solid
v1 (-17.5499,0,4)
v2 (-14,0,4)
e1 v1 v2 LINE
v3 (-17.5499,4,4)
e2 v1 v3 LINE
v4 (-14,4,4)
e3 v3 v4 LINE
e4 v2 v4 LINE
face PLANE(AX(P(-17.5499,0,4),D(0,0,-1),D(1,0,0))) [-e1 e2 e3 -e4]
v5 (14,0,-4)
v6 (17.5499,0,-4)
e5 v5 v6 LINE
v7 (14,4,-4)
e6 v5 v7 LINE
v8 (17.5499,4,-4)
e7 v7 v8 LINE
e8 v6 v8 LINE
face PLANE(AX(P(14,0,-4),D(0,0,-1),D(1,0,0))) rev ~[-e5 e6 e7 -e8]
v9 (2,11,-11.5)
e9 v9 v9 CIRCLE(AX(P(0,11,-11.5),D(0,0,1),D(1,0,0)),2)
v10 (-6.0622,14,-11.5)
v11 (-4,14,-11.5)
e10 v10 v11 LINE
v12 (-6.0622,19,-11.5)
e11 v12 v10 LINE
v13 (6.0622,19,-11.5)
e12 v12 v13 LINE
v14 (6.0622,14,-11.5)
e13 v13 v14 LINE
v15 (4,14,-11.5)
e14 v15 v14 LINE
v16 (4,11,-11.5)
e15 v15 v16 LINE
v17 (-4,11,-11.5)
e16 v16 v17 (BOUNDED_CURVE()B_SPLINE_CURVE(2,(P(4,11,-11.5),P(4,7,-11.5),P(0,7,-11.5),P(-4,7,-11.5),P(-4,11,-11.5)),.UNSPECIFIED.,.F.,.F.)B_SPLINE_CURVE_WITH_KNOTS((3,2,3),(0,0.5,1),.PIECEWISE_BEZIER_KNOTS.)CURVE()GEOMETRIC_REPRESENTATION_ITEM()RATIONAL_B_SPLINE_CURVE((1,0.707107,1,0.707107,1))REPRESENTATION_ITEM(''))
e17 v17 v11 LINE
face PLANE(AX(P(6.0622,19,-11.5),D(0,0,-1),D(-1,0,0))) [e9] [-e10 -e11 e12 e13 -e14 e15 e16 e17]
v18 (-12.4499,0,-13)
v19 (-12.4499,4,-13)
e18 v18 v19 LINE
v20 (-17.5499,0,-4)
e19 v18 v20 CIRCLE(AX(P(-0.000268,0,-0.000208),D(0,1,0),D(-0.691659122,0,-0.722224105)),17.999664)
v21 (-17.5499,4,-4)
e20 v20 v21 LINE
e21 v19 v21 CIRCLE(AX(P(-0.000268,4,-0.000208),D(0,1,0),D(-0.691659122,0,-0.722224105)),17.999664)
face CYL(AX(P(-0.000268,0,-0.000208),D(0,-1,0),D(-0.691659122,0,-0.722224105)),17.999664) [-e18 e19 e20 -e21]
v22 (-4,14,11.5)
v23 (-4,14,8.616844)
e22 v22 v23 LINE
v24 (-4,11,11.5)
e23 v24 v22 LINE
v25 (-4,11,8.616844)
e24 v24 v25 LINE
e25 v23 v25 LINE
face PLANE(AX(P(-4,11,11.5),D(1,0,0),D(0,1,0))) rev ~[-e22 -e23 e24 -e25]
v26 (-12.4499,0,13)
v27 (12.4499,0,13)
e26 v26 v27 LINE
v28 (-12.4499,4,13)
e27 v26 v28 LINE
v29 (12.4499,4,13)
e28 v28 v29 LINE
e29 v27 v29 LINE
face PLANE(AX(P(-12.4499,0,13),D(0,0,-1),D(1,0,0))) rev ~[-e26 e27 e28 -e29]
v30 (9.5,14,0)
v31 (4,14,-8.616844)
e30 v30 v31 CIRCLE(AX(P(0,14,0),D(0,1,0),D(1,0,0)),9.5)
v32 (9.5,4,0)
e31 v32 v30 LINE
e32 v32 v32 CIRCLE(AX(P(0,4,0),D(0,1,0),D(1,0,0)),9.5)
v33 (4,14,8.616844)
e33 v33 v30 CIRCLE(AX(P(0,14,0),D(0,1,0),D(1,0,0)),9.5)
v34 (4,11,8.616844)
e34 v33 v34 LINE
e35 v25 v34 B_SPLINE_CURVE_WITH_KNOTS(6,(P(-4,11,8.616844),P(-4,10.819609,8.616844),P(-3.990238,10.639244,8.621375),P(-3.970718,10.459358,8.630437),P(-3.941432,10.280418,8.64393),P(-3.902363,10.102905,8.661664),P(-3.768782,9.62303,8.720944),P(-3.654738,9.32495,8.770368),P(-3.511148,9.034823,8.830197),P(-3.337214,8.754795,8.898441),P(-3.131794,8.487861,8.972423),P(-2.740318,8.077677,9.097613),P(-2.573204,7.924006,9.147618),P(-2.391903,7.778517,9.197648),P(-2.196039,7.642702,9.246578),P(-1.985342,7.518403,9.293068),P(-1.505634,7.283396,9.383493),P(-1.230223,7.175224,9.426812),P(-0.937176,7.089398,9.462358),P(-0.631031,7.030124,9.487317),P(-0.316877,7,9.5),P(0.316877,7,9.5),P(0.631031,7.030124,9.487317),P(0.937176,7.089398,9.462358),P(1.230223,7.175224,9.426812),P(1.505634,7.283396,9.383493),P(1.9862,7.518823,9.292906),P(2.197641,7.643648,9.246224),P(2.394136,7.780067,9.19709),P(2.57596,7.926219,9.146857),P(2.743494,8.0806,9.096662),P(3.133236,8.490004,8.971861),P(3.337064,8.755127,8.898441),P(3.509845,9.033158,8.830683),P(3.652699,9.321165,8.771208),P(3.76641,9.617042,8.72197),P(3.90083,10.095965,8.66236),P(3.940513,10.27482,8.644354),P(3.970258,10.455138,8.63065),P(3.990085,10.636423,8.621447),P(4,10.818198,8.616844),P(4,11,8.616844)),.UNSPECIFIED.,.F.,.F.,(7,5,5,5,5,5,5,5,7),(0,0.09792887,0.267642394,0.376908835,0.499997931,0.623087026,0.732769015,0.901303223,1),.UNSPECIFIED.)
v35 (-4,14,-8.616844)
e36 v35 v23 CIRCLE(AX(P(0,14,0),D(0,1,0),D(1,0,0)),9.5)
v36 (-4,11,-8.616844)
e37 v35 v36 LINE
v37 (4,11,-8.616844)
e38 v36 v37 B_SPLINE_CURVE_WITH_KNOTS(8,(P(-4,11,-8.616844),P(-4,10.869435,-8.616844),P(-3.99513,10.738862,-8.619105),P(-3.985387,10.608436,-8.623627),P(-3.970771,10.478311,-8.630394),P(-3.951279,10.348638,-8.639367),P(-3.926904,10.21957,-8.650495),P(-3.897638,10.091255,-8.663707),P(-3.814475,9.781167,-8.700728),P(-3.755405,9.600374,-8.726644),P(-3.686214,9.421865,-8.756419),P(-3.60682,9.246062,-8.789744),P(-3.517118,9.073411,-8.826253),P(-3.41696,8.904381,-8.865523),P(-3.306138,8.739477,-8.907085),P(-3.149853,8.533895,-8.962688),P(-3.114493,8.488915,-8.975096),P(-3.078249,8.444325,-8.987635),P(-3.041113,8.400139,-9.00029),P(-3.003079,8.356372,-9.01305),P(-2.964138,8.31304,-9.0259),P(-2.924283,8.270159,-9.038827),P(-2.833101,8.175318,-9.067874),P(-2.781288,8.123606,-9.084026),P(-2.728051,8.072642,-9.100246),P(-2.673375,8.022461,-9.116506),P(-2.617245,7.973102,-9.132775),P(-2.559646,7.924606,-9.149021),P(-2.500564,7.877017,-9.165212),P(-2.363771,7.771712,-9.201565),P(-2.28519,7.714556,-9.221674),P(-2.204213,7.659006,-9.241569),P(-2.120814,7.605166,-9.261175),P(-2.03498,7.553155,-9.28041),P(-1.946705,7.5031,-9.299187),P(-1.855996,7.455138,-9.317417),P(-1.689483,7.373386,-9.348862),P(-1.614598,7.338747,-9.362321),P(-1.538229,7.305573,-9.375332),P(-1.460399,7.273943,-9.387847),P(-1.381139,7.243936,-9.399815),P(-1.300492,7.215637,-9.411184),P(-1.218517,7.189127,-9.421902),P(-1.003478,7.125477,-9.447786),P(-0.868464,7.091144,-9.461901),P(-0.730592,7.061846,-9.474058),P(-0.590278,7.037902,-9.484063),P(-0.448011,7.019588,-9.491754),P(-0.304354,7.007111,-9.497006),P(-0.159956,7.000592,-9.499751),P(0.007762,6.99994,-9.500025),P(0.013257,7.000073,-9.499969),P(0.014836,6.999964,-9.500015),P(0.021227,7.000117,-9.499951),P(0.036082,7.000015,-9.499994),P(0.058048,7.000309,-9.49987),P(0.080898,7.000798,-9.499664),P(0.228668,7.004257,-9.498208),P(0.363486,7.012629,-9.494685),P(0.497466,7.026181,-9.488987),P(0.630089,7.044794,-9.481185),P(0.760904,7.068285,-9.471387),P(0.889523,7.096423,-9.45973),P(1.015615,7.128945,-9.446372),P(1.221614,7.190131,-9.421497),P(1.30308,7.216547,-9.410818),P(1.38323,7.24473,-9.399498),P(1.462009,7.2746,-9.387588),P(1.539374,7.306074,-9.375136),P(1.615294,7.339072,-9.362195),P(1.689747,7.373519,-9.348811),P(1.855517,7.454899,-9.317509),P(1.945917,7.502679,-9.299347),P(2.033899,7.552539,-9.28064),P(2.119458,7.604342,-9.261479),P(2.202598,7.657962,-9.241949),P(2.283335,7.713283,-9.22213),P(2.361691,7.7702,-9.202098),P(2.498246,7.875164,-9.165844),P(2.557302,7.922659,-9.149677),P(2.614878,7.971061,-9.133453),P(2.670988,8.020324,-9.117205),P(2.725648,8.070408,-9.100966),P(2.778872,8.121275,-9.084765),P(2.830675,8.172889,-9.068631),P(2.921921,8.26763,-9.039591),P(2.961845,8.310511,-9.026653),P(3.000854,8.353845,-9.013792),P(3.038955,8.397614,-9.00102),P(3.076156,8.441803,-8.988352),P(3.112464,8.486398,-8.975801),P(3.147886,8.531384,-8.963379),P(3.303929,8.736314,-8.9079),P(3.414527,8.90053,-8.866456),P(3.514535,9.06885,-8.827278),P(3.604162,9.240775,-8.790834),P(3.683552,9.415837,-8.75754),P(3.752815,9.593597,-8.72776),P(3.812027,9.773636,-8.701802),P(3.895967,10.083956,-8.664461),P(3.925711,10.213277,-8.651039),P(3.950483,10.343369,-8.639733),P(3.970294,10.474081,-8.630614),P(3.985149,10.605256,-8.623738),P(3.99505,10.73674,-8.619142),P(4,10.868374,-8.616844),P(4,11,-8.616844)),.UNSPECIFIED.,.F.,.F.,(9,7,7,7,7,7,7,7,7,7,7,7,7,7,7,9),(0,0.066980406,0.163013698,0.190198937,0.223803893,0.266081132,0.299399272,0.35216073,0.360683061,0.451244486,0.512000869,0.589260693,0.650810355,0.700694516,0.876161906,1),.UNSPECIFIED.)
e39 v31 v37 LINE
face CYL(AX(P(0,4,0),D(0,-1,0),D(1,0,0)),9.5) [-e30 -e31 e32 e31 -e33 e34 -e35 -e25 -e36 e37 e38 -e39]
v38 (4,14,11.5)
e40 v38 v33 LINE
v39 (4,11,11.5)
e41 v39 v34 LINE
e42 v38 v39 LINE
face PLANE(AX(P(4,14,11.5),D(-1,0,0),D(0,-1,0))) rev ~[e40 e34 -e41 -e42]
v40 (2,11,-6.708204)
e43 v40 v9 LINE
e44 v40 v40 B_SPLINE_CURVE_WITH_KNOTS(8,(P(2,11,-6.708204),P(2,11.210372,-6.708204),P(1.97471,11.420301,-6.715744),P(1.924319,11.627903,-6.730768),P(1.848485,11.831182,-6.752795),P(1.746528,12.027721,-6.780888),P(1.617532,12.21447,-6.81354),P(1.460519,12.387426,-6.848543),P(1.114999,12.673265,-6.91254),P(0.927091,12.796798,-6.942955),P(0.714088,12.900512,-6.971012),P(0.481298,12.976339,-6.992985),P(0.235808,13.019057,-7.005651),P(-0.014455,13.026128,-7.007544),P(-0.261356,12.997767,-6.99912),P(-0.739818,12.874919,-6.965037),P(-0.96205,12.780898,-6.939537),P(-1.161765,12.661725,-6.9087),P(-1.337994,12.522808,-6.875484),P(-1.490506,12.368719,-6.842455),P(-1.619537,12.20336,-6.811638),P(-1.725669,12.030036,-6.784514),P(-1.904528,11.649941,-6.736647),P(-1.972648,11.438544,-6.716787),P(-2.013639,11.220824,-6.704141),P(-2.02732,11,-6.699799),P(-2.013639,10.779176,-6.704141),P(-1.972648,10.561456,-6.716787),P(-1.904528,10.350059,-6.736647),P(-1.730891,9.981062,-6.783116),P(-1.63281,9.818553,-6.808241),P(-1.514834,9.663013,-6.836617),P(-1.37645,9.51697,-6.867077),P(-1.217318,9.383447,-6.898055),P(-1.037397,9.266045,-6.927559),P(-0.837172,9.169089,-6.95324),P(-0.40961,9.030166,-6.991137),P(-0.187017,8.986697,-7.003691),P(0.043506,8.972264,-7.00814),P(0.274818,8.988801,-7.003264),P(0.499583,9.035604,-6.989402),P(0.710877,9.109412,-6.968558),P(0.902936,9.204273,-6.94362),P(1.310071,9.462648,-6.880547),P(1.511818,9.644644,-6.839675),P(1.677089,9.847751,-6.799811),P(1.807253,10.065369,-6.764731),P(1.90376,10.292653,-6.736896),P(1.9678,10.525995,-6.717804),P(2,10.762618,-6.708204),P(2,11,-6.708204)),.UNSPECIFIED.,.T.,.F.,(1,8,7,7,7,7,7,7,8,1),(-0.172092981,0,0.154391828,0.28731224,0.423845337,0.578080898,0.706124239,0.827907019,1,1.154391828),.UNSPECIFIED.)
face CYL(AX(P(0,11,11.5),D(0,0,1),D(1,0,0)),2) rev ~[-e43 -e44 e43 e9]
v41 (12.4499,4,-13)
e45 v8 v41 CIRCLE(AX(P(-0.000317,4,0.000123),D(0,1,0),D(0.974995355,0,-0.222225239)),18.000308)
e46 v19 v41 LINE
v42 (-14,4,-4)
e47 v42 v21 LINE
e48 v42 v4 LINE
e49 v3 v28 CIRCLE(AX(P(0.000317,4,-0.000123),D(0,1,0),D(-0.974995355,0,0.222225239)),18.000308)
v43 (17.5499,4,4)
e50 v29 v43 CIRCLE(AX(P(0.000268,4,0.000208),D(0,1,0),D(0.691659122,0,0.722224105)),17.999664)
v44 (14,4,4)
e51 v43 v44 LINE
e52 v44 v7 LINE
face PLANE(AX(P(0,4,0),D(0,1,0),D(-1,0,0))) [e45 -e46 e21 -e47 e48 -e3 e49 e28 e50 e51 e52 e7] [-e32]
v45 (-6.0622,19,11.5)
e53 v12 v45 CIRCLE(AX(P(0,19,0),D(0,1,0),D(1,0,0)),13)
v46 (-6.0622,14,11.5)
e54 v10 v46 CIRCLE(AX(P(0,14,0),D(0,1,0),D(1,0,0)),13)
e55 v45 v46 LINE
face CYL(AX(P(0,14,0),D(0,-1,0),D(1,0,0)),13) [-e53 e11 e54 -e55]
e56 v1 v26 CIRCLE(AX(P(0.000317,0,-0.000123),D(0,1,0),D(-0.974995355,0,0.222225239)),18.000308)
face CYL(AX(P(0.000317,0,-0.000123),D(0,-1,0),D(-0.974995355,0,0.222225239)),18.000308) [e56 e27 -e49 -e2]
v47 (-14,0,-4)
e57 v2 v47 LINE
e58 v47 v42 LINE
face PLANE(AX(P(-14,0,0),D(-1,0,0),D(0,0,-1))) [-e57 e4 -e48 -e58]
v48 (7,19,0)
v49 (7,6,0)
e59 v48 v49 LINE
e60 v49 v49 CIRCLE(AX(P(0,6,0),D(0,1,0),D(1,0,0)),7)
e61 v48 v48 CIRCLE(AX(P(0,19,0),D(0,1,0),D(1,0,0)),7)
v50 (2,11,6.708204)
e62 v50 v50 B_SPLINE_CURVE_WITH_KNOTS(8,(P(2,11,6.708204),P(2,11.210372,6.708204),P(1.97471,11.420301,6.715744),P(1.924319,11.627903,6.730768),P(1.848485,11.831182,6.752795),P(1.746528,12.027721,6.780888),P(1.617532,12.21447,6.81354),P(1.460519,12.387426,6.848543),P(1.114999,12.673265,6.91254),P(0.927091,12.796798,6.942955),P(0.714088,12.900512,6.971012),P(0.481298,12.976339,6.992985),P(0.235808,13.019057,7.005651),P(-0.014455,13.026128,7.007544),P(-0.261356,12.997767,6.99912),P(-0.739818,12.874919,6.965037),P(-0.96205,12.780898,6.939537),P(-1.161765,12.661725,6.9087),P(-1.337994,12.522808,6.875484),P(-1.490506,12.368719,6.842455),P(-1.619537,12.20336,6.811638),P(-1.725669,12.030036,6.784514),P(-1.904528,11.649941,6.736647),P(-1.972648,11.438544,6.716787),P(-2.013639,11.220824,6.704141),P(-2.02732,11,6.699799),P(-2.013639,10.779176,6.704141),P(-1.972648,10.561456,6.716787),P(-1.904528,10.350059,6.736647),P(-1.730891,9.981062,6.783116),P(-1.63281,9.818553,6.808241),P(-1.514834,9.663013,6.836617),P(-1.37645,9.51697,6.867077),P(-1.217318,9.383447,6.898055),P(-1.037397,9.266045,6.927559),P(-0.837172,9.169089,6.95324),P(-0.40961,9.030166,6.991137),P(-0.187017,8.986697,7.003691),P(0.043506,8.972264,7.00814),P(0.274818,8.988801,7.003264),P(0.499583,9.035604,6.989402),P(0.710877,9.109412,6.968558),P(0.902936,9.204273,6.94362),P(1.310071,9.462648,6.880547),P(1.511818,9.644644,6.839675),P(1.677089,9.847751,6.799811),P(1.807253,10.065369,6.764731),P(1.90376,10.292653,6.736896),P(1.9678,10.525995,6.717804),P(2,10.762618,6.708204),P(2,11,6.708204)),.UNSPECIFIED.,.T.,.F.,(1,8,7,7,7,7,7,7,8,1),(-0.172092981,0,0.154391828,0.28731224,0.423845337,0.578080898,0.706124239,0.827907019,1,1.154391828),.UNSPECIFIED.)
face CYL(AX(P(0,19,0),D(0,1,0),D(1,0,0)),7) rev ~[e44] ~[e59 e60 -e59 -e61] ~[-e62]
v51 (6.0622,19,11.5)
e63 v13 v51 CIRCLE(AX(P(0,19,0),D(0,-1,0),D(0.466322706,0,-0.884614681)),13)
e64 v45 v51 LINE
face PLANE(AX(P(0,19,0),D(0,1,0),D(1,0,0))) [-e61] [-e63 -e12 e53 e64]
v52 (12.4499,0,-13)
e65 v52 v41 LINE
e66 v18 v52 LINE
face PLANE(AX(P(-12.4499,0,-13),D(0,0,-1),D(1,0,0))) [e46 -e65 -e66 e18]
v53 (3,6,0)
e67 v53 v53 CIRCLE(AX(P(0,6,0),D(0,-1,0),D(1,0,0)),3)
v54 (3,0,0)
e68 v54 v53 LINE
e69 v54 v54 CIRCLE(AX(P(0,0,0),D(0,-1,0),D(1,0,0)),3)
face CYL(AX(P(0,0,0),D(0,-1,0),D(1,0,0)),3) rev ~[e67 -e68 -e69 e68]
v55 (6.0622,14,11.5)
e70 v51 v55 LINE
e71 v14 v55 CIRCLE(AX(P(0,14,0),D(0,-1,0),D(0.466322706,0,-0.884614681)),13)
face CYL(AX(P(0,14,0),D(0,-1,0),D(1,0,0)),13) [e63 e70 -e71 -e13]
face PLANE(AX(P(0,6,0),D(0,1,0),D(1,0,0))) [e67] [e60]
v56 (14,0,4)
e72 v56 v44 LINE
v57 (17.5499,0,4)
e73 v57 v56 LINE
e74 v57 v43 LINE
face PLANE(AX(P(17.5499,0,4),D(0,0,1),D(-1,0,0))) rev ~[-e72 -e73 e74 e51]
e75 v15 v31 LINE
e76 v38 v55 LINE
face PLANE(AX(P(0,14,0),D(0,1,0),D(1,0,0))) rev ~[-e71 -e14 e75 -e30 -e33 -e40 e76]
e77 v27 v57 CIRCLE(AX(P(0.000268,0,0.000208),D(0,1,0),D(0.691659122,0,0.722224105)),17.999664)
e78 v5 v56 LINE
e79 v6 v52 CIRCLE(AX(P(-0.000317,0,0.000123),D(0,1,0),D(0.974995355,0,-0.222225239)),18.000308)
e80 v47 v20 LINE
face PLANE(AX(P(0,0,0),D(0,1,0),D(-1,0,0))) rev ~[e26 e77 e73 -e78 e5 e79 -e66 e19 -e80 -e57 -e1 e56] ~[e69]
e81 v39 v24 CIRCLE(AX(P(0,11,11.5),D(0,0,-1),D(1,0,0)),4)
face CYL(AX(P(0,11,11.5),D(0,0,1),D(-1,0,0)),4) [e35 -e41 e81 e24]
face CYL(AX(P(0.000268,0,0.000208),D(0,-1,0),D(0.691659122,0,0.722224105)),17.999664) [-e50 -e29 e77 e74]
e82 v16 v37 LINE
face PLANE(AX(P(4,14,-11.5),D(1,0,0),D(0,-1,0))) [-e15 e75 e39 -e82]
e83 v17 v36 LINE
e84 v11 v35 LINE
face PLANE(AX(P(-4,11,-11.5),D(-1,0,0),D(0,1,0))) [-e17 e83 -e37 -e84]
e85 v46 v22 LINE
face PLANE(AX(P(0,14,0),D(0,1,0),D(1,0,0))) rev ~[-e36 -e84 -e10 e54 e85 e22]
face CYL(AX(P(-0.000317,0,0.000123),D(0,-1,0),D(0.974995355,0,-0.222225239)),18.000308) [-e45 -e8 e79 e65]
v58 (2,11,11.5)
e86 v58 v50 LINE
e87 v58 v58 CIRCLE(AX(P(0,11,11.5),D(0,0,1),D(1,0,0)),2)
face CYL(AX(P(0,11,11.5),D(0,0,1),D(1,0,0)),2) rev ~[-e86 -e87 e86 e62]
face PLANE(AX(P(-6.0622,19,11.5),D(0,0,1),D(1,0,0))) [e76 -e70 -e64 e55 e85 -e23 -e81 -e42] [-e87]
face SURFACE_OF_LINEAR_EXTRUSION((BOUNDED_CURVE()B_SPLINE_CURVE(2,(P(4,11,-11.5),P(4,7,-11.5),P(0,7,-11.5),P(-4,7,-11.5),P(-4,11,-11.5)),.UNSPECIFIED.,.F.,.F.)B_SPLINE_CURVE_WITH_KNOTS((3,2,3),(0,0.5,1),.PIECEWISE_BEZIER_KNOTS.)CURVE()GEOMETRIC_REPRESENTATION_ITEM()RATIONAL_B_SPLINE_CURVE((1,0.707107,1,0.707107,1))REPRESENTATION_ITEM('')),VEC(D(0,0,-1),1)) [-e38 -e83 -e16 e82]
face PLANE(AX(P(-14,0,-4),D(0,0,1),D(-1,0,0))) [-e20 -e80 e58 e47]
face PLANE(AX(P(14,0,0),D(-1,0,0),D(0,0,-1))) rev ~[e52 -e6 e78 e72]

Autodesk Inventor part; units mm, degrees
ref_plane "YZ Plane" through (0, 0, 0) normal (1, 0, 0) x (0, 1, 0)
ref_plane "XZ Plane" through (0, 0, 0) normal (0, 1, 0) x (-1, 0, 0)
ref_plane "XY Plane" through (0, 0, 0) normal (0, 0, 1) x (1, 0, 0)
sketch "草图1" plane through (0, 0, 0) normal (0, 1, 0) x (-1, 0, 0)
  line L0 (12.4499, -13) -> (-12.4499, -13)
  line L1 (12.4499, 13) -> (-12.4499, 13)
  line L2 (21.8859, 0) -> (-29.1909, 0)
  line L3 (17.5499, 4) -> (14, 4)
  line L4 (14, 4) -> (14, -4)
  line L5 (14, -4) -> (17.5499, -4)
  line L6 (22, 4) -> (14, -4) construction
  line L7 (14, 4) -> (22, -4) construction
  line L8 (-17.5499, 4) -> (-14, 4)
  line L9 (-14, 4) -> (-14, -4)
  line L10 (-14, -4) -> (-17.5499, -4)
  line L11 (-22, 4) -> (-14, -4) construction
  line L12 (-14, 4) -> (-22, -4) construction
  arc A0 (12.4499, -13) -> (17.5499, -4) centre (0, 0) ccw
  arc A1 (17.5499, 4) -> (12.4499, 13) centre (0, 0) ccw
  arc A2 (-12.4499, 13) -> (-17.5499, 4) centre (0, 0) ccw
  arc A3 (-17.5499, -4) -> (-12.4499, -13) centre (0, 0) ccw
  point P0 (18, 0)
  point P1 (-18, 0)
  dimension "d1" = 26
  dimension "d2" = 8
  dimension "d3" = 8
  dimension "d4" = 8
  dimension "d5" = 8
extrude "拉伸1" add sketch "草图1" along normal blind 4
sketch "草图2" plane through (0, 4, 0) normal (0, 1, 0) x (1, 0, 0)
  arc A0 (17.5499, 4) -> (12.4499, 13) centre (0, 0) ccw projected
  circle A1 centre (0, 0) radius 9.5
  dimension "d8" = 19
extrude "拉伸2" add sketch "草图2" along normal blind 10
sketch "草图3" plane through (0, 14, 0) normal (0, 1, 0) x (1, 0, 0)
  circle A0 centre (0, 0) radius 9.5 projected
  circle A1 centre (0, 0) radius 13
  dimension "d11" = 26
extrude "拉伸3" add sketch "草图3" along normal blind 5 contours A0 | A1
sketch "草图4" plane through (0, 19, 0) normal (0, 1, 0) x (1, 0, 0)
  circle A0 centre (0, 0) radius 13 projected
  line L0 (-22.4415, 0) -> (25.3714, 0)
  line L1 (-6.0622, 11.5) -> (6.0622, 11.5)
  line L2 (-6.0622, -11.5) -> (6.0622, -11.5)
  dimension "d14" = 23
extrude "拉伸4" cut sketch "草图4" against normal blind 5 contours L1 A0 | A0 L2
sketch "草图5" plane through (-6.0622, 19, 11.5) normal (0, 0, 1) x (1, 0, 0)
  line L0 (0, 0) -> (12.1244, 0) projected
  line L1 (15.5622, -5) -> (-3.4378, -5) projected
  line L2 (-3.4378, -15) -> (15.5622, -15) projected
  line L3 (6.0622, -19) -> (6.0622, 3.3866)
  line L4 (2.0622, -8) -> (2.0622, -5)
  line L5 (2.0622, -5) -> (10.0622, -5)
  line L6 (10.0622, -5) -> (10.0622, -8)
  line L7 (10.0622, -8) -> (2.0622, -5) construction
  line L8 (2.0622, -8) -> (10.0622, -5) construction
  arc A0 (2.0622, -8) -> (10.0622, -8) centre (6.0622, -8) ccw
  point P0 (6.0622, -6.5)
  dimension "d17" = 8
  dimension "d18" = 3
extrude "拉伸5" add sketch "草图5" against normal blind 5
sketch "草图6" plane through (6.0622, 19, -11.5) normal (0, 0, -1) x (-1, 0, 0)
  line L0 (10.0622, -8) -> (10.0622, -5) projected
  line L1 (2.0622, -5) -> (10.0622, -5) projected
  line L2 (2.0622, -5) -> (2.0622, -8) projected
  line L3 (-3.4378, -15) -> (15.5622, -15) projected
  spline S0 degree 2 poles (2.0622, -8) (2.0622, -12) (6.0622, -12) (10.0622, -12) (10.0622, -8) knots 0 0 0 0.5 0.5 1 1 1 weights 1 0.707107 1 0.707107 1 projected
  point P0 (6.0622, -19)
extrude "拉伸6" add sketch "草图6" against normal blind 5
sketch "草图7" plane through (-6.0622, 19, 11.5) normal (0, 0, 1) x (1, 0, 0)
  arc A0 (2.0622, -8) -> (10.0622, -8) centre (6.0622, -8) ccw projected
  circle A1 centre (6.0622, -8) radius 2
  point P0 (6.0622, -19)
  dimension "d23" = 4
extrude "拉伸7" cut sketch "草图7" against normal blind 30
sketch "草图8" plane through (0, 19, 0) normal (0, 1, 0) x (1, 0, 0)
  arc A0 (6.0622, -11.5) -> (6.0622, 11.5) centre (0, 0) ccw projected
  circle A1 centre (0, 0) radius 7
  dimension "d26" = 14
extrude "拉伸8" cut sketch "草图8" against normal blind 13
sketch "草图9" plane through (0, 0, 0) normal (0, -1, 0) x (1, 0, 0)
  arc A0 (-17.5499, -4) -> (-12.4499, -13) centre (0, 0) ccw projected
  circle A1 centre (0, 0) radius 3
  dimension "d29" = 6
extrude "拉伸9" cut sketch "草图9" against normal blind 13
